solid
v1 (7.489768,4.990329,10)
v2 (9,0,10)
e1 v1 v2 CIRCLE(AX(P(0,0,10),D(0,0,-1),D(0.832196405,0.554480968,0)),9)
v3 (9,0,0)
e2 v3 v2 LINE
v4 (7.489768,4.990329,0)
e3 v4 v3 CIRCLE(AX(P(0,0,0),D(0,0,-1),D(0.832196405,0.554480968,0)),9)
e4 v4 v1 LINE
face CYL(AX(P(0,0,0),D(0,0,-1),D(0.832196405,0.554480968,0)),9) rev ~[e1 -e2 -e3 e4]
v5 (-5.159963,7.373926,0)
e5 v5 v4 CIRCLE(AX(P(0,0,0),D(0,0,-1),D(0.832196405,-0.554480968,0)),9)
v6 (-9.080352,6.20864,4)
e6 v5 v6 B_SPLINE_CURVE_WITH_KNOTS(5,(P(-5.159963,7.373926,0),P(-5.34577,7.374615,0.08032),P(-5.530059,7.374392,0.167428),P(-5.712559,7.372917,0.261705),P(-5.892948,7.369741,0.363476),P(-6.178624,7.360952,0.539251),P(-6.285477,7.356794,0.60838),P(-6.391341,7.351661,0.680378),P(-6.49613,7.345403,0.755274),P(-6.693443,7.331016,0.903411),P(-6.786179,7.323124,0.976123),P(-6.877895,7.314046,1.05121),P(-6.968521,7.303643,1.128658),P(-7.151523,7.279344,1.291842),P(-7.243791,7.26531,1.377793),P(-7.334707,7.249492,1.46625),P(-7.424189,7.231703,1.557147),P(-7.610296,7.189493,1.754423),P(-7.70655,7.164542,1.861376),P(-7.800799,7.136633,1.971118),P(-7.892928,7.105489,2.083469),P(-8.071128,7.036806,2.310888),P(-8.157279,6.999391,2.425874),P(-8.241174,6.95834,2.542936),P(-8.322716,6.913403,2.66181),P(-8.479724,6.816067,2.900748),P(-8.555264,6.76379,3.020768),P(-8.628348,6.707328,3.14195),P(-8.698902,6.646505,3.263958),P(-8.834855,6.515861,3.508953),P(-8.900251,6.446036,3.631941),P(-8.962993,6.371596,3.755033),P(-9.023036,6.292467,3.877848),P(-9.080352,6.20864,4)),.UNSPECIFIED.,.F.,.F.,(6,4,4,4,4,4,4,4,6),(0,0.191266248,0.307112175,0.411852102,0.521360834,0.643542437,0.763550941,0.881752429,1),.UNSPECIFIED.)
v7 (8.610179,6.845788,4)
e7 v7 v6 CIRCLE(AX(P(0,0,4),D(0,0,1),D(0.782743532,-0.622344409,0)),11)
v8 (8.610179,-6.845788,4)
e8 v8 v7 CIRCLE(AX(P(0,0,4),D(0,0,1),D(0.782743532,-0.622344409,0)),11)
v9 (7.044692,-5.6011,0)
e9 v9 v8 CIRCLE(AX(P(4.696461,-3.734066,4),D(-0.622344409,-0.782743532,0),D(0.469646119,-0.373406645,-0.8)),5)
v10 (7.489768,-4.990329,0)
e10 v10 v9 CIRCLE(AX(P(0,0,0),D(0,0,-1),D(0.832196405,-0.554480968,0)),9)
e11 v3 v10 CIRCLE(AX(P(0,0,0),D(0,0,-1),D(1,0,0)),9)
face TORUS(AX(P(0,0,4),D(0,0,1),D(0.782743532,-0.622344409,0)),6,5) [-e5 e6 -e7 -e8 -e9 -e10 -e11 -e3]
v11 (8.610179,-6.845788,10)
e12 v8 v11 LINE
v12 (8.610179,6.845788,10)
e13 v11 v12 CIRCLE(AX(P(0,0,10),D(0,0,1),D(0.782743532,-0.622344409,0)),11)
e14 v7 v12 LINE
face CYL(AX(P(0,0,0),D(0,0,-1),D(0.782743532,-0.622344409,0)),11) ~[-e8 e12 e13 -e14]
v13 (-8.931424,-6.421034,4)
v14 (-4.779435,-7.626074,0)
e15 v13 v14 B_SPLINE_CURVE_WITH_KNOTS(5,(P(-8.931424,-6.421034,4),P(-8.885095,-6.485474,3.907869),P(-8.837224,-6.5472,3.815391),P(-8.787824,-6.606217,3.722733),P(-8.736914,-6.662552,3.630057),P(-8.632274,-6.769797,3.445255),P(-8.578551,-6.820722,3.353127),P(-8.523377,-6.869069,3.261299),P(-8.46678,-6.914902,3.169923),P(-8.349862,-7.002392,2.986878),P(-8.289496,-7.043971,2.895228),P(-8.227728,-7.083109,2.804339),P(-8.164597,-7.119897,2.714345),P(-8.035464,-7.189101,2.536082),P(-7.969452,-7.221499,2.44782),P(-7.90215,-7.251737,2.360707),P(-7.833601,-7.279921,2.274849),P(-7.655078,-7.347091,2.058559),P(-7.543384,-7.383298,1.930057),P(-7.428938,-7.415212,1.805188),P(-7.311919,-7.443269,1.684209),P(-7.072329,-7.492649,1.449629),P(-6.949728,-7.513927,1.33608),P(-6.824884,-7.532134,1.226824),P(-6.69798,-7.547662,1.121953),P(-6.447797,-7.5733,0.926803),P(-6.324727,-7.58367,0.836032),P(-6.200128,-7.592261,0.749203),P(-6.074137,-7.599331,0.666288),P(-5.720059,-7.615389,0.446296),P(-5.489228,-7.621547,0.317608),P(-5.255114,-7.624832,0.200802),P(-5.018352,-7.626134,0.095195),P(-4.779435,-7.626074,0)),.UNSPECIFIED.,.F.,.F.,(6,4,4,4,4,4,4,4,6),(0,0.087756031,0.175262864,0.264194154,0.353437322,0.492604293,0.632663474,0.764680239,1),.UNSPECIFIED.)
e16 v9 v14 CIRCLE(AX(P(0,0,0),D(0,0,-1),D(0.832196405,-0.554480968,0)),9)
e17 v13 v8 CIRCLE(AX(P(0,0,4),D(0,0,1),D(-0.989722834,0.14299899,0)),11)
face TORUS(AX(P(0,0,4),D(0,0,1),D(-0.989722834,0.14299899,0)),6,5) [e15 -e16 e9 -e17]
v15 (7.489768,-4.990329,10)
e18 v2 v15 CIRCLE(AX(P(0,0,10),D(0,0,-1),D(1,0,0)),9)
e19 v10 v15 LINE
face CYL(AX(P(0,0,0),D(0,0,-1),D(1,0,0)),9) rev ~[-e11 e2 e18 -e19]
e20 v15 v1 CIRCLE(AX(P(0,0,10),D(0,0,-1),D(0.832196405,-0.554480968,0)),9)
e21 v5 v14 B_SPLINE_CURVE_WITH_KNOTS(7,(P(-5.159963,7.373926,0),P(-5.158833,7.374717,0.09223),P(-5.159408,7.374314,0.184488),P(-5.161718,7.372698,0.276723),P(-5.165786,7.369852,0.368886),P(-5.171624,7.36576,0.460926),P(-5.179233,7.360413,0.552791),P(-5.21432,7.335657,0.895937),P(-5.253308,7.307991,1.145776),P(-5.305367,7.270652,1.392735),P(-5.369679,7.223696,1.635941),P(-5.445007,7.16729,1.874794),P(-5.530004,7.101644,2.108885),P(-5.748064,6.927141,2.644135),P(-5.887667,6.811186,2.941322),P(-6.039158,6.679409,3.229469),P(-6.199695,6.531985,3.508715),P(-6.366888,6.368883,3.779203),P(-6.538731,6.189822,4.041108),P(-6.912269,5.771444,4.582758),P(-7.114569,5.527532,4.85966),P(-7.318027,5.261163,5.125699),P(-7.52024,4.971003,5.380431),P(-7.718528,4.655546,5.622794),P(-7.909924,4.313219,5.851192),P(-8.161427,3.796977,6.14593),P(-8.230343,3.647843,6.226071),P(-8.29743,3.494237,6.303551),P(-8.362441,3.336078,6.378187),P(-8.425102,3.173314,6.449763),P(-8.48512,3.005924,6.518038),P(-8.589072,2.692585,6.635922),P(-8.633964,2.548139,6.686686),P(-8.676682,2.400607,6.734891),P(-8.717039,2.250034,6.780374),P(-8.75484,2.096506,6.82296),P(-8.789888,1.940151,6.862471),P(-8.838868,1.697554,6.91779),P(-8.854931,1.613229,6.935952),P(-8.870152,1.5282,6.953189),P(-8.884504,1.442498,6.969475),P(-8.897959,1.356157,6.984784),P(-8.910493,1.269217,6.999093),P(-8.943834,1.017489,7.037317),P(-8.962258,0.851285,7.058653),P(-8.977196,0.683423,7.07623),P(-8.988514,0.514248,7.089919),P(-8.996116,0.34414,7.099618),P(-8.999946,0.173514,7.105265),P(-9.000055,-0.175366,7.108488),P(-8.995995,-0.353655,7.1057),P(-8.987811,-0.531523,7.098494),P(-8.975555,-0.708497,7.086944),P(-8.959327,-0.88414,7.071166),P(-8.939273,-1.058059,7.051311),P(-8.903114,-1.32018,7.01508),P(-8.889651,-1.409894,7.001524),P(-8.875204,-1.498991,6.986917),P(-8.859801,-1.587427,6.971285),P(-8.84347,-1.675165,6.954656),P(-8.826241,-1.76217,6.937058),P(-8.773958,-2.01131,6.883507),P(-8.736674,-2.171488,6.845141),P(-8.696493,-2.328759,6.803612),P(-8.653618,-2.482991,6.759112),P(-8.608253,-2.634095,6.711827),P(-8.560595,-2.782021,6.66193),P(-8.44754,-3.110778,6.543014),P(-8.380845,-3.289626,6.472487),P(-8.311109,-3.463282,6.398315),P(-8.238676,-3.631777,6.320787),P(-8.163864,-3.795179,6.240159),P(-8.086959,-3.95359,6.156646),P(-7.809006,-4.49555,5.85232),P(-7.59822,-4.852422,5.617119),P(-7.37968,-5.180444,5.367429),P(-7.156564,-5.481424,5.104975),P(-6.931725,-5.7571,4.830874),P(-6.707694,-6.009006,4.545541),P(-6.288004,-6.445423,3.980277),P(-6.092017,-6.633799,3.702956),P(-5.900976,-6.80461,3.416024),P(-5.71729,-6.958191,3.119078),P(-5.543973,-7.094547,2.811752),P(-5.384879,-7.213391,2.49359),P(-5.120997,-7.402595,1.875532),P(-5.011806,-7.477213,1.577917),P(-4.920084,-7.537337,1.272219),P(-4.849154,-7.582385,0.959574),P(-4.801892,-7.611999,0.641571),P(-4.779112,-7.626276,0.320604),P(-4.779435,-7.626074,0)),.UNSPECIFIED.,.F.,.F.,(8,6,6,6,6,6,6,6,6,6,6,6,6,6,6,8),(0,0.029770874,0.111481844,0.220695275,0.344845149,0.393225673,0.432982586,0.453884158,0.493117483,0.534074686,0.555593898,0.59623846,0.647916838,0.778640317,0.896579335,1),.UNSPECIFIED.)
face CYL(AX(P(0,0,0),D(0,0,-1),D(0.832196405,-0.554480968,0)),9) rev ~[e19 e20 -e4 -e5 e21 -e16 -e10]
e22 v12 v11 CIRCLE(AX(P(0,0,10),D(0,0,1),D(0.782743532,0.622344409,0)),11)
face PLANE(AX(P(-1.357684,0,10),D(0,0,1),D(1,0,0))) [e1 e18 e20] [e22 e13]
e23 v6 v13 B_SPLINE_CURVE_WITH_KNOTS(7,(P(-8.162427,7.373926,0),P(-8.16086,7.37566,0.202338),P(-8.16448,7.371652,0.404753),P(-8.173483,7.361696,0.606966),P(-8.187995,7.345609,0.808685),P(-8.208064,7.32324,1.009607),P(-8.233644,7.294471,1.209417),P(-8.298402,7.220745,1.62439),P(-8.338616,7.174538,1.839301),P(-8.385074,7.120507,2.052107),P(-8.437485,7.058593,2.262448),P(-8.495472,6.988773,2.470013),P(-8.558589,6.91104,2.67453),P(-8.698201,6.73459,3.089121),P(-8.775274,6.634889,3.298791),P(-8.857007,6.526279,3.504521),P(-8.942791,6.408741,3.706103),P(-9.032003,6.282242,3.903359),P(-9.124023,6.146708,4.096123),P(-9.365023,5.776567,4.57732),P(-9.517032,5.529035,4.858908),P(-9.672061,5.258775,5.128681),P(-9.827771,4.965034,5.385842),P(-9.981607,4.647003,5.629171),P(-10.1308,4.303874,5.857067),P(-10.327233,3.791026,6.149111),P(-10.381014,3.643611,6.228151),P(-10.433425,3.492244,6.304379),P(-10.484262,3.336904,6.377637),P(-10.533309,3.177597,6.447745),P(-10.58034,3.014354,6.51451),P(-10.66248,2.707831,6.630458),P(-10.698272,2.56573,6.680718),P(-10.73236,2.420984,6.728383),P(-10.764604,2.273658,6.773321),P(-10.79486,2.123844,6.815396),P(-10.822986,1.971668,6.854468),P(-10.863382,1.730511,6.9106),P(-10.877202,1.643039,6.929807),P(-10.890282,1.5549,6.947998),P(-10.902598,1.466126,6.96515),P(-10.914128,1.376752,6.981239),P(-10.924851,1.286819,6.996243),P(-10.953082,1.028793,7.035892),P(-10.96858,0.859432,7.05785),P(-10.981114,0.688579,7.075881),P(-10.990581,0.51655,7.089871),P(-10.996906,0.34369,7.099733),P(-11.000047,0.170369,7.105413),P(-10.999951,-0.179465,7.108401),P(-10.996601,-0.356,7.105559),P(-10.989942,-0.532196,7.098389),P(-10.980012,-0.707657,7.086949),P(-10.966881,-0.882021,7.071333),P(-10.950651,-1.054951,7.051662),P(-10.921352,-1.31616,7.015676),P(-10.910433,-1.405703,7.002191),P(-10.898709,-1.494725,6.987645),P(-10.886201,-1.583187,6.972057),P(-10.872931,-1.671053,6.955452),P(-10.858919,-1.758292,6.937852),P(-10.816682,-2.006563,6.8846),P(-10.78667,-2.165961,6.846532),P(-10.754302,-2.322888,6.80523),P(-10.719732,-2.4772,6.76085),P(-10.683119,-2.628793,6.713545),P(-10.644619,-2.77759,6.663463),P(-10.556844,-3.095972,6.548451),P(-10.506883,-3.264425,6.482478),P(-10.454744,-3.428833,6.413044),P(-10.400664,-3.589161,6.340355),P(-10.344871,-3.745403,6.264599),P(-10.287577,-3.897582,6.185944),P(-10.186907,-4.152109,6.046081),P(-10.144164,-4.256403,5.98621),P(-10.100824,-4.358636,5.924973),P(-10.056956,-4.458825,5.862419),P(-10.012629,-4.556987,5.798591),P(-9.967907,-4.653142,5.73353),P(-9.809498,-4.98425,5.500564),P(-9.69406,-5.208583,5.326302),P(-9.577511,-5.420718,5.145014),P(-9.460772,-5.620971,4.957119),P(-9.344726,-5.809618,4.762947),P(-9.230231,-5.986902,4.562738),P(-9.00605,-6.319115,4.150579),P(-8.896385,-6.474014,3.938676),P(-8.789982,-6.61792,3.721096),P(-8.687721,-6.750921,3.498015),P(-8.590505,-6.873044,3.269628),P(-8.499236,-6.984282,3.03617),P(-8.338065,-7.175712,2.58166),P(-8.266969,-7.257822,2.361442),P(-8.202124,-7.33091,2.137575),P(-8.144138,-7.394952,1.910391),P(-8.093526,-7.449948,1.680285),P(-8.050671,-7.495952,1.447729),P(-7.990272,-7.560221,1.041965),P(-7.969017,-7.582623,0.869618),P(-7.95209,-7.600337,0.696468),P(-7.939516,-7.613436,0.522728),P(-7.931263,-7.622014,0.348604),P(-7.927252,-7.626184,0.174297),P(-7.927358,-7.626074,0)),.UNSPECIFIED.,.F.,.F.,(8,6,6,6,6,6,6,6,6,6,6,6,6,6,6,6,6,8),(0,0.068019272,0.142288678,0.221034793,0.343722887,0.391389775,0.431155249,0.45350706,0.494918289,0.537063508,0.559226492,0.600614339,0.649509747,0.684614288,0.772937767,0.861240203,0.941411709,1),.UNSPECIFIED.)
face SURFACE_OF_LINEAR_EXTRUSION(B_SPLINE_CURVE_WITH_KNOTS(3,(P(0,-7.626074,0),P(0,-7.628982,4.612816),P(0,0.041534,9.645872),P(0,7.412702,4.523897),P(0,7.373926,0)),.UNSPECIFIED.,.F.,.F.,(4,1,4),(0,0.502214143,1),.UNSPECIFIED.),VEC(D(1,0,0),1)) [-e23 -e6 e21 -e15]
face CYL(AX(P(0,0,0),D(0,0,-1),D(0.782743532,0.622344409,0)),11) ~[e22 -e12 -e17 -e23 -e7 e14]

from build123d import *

# Parameters (mm, degrees)
F1_DEPTH    = 10
F3_DEPTH    = 25
F4_DEPTH    = 25
F5_T2_ANGLE = 228.5604314435
F5_T4_ANGLE = 149.7338838055


# Not quite as in the source:
# - a fillet or chamfer that OpenCascade refuses, or shapes differently, is made with other operations: its cross-section is extruded or revolved along the edge and cut away or added


with BuildPart() as f1:
    # F0 (on Top) → F1 (new body)
    with BuildSketch(Plane.XY):
        with BuildLine():
            ThreePointArc((7.4897676428, -4.9903287123), (-9, 0), (7.4897676428, 4.9903287123))
            ThreePointArc((7.4897676428, 4.9903287123), (8.0061615463, 5.944514107), (8.6101788512, 6.8457884973))
            ThreePointArc((8.6101788512, 6.8457884973), (-11, 0), (8.6101788512, -6.8457884973))
            ThreePointArc((8.6101788512, -6.8457884973), (8.0061615463, -5.944514107), (7.4897676428, -4.9903287123))
        make_face()
        with BuildLine():
            ThreePointArc((7.4897676428, 4.9903287123), (8.6141717183, 2.6069226316), (9, 0))
            ThreePointArc((9, 0), (8.6141717183, -2.6069226316), (7.4897676428, -4.9903287123))
            ThreePointArc((7.4897676428, -4.9903287123), (8.0061615463, -5.944514107), (8.6101788512, -6.8457884973))
            ThreePointArc((8.6101788512, -6.8457884973), (11, 0), (8.6101788512, 6.8457884973))
            ThreePointArc((8.6101788512, 6.8457884973), (8.0061615463, 5.944514107), (7.4897676428, 4.9903287123))
        make_face()
    extrude(amount=F1_DEPTH)

    # F2 (on Right) → F3 (cut)
    with BuildSketch(Plane.YZ):
        with BuildLine():
            add(Edge.make_bspline(
                [(-7.6260738851, 0), (-7.6289822236, 4.6128164915), (0.0415342584, 9.6458716707), (7.41270182, 4.5238972991), (7.3739261149, 0)],
                knots=[0, 0, 0, 0, 0.502214143, 1, 1, 1, 1], degree=3))
            Line((-7.6260738851, 0), (7.3739261149, 0))
        make_face()
    extrude(amount=-F3_DEPTH, mode=Mode.SUBTRACT)

    # F2 (on Right) → F4 (cut)
    with BuildSketch(Plane.YZ):
        with BuildLine():
            add(Edge.make_bspline(
                [(-7.6260738851, 0), (-7.6289822236, 4.6128164915), (0.0415342584, 9.6458716707), (7.41270182, 4.5238972991), (7.3739261149, 0)],
                knots=[0, 0, 0, 0, 0.502214143, 1, 1, 1, 1], degree=3))
            Line((-7.6260738851, 0), (7.3739261149, 0))
        make_face()
    extrude(amount=-F4_DEPTH, mode=Mode.SUBTRACT)

    # F5: fillet of radius 5 on 2 edges, made by hand

    # F5_s1 → F5_t2 (revolve, cut)
    with BuildSketch(Plane(origin=(0, 0, 0), x_dir=(0, 0, 1), z_dir=(-0.6223444088, -0.7827435319, 0))):
        with BuildLine():
            ThreePointArc((0, -9), (1.7639320225, -10.472135955), (4, -11))
            Line((4, -11), (0, -11))
            Line((0, -11), (0, -9))
        make_face()
    revolve(axis=Axis((0, 0, 0), (0, 0, 1)), revolution_arc=F5_T2_ANGLE, mode=Mode.SUBTRACT)

    # F5_s3 → F5_t4 (revolve, cut)
    with BuildSketch(Plane(origin=(0, 0, 0), x_dir=(0, 0, 1), z_dir=(0.1429989905, 0.9897228343, 0))):
        with BuildLine():
            ThreePointArc((0, -9), (1.7639320225, -10.472135955), (4, -11))
            Line((4, -11), (0, -11))
            Line((0, -11), (0, -9))
        make_face()
    revolve(axis=Axis((0, 0, 0), (0, 0, 1)), revolution_arc=F5_T4_ANGLE, mode=Mode.SUBTRACT)


solid = f1.part
